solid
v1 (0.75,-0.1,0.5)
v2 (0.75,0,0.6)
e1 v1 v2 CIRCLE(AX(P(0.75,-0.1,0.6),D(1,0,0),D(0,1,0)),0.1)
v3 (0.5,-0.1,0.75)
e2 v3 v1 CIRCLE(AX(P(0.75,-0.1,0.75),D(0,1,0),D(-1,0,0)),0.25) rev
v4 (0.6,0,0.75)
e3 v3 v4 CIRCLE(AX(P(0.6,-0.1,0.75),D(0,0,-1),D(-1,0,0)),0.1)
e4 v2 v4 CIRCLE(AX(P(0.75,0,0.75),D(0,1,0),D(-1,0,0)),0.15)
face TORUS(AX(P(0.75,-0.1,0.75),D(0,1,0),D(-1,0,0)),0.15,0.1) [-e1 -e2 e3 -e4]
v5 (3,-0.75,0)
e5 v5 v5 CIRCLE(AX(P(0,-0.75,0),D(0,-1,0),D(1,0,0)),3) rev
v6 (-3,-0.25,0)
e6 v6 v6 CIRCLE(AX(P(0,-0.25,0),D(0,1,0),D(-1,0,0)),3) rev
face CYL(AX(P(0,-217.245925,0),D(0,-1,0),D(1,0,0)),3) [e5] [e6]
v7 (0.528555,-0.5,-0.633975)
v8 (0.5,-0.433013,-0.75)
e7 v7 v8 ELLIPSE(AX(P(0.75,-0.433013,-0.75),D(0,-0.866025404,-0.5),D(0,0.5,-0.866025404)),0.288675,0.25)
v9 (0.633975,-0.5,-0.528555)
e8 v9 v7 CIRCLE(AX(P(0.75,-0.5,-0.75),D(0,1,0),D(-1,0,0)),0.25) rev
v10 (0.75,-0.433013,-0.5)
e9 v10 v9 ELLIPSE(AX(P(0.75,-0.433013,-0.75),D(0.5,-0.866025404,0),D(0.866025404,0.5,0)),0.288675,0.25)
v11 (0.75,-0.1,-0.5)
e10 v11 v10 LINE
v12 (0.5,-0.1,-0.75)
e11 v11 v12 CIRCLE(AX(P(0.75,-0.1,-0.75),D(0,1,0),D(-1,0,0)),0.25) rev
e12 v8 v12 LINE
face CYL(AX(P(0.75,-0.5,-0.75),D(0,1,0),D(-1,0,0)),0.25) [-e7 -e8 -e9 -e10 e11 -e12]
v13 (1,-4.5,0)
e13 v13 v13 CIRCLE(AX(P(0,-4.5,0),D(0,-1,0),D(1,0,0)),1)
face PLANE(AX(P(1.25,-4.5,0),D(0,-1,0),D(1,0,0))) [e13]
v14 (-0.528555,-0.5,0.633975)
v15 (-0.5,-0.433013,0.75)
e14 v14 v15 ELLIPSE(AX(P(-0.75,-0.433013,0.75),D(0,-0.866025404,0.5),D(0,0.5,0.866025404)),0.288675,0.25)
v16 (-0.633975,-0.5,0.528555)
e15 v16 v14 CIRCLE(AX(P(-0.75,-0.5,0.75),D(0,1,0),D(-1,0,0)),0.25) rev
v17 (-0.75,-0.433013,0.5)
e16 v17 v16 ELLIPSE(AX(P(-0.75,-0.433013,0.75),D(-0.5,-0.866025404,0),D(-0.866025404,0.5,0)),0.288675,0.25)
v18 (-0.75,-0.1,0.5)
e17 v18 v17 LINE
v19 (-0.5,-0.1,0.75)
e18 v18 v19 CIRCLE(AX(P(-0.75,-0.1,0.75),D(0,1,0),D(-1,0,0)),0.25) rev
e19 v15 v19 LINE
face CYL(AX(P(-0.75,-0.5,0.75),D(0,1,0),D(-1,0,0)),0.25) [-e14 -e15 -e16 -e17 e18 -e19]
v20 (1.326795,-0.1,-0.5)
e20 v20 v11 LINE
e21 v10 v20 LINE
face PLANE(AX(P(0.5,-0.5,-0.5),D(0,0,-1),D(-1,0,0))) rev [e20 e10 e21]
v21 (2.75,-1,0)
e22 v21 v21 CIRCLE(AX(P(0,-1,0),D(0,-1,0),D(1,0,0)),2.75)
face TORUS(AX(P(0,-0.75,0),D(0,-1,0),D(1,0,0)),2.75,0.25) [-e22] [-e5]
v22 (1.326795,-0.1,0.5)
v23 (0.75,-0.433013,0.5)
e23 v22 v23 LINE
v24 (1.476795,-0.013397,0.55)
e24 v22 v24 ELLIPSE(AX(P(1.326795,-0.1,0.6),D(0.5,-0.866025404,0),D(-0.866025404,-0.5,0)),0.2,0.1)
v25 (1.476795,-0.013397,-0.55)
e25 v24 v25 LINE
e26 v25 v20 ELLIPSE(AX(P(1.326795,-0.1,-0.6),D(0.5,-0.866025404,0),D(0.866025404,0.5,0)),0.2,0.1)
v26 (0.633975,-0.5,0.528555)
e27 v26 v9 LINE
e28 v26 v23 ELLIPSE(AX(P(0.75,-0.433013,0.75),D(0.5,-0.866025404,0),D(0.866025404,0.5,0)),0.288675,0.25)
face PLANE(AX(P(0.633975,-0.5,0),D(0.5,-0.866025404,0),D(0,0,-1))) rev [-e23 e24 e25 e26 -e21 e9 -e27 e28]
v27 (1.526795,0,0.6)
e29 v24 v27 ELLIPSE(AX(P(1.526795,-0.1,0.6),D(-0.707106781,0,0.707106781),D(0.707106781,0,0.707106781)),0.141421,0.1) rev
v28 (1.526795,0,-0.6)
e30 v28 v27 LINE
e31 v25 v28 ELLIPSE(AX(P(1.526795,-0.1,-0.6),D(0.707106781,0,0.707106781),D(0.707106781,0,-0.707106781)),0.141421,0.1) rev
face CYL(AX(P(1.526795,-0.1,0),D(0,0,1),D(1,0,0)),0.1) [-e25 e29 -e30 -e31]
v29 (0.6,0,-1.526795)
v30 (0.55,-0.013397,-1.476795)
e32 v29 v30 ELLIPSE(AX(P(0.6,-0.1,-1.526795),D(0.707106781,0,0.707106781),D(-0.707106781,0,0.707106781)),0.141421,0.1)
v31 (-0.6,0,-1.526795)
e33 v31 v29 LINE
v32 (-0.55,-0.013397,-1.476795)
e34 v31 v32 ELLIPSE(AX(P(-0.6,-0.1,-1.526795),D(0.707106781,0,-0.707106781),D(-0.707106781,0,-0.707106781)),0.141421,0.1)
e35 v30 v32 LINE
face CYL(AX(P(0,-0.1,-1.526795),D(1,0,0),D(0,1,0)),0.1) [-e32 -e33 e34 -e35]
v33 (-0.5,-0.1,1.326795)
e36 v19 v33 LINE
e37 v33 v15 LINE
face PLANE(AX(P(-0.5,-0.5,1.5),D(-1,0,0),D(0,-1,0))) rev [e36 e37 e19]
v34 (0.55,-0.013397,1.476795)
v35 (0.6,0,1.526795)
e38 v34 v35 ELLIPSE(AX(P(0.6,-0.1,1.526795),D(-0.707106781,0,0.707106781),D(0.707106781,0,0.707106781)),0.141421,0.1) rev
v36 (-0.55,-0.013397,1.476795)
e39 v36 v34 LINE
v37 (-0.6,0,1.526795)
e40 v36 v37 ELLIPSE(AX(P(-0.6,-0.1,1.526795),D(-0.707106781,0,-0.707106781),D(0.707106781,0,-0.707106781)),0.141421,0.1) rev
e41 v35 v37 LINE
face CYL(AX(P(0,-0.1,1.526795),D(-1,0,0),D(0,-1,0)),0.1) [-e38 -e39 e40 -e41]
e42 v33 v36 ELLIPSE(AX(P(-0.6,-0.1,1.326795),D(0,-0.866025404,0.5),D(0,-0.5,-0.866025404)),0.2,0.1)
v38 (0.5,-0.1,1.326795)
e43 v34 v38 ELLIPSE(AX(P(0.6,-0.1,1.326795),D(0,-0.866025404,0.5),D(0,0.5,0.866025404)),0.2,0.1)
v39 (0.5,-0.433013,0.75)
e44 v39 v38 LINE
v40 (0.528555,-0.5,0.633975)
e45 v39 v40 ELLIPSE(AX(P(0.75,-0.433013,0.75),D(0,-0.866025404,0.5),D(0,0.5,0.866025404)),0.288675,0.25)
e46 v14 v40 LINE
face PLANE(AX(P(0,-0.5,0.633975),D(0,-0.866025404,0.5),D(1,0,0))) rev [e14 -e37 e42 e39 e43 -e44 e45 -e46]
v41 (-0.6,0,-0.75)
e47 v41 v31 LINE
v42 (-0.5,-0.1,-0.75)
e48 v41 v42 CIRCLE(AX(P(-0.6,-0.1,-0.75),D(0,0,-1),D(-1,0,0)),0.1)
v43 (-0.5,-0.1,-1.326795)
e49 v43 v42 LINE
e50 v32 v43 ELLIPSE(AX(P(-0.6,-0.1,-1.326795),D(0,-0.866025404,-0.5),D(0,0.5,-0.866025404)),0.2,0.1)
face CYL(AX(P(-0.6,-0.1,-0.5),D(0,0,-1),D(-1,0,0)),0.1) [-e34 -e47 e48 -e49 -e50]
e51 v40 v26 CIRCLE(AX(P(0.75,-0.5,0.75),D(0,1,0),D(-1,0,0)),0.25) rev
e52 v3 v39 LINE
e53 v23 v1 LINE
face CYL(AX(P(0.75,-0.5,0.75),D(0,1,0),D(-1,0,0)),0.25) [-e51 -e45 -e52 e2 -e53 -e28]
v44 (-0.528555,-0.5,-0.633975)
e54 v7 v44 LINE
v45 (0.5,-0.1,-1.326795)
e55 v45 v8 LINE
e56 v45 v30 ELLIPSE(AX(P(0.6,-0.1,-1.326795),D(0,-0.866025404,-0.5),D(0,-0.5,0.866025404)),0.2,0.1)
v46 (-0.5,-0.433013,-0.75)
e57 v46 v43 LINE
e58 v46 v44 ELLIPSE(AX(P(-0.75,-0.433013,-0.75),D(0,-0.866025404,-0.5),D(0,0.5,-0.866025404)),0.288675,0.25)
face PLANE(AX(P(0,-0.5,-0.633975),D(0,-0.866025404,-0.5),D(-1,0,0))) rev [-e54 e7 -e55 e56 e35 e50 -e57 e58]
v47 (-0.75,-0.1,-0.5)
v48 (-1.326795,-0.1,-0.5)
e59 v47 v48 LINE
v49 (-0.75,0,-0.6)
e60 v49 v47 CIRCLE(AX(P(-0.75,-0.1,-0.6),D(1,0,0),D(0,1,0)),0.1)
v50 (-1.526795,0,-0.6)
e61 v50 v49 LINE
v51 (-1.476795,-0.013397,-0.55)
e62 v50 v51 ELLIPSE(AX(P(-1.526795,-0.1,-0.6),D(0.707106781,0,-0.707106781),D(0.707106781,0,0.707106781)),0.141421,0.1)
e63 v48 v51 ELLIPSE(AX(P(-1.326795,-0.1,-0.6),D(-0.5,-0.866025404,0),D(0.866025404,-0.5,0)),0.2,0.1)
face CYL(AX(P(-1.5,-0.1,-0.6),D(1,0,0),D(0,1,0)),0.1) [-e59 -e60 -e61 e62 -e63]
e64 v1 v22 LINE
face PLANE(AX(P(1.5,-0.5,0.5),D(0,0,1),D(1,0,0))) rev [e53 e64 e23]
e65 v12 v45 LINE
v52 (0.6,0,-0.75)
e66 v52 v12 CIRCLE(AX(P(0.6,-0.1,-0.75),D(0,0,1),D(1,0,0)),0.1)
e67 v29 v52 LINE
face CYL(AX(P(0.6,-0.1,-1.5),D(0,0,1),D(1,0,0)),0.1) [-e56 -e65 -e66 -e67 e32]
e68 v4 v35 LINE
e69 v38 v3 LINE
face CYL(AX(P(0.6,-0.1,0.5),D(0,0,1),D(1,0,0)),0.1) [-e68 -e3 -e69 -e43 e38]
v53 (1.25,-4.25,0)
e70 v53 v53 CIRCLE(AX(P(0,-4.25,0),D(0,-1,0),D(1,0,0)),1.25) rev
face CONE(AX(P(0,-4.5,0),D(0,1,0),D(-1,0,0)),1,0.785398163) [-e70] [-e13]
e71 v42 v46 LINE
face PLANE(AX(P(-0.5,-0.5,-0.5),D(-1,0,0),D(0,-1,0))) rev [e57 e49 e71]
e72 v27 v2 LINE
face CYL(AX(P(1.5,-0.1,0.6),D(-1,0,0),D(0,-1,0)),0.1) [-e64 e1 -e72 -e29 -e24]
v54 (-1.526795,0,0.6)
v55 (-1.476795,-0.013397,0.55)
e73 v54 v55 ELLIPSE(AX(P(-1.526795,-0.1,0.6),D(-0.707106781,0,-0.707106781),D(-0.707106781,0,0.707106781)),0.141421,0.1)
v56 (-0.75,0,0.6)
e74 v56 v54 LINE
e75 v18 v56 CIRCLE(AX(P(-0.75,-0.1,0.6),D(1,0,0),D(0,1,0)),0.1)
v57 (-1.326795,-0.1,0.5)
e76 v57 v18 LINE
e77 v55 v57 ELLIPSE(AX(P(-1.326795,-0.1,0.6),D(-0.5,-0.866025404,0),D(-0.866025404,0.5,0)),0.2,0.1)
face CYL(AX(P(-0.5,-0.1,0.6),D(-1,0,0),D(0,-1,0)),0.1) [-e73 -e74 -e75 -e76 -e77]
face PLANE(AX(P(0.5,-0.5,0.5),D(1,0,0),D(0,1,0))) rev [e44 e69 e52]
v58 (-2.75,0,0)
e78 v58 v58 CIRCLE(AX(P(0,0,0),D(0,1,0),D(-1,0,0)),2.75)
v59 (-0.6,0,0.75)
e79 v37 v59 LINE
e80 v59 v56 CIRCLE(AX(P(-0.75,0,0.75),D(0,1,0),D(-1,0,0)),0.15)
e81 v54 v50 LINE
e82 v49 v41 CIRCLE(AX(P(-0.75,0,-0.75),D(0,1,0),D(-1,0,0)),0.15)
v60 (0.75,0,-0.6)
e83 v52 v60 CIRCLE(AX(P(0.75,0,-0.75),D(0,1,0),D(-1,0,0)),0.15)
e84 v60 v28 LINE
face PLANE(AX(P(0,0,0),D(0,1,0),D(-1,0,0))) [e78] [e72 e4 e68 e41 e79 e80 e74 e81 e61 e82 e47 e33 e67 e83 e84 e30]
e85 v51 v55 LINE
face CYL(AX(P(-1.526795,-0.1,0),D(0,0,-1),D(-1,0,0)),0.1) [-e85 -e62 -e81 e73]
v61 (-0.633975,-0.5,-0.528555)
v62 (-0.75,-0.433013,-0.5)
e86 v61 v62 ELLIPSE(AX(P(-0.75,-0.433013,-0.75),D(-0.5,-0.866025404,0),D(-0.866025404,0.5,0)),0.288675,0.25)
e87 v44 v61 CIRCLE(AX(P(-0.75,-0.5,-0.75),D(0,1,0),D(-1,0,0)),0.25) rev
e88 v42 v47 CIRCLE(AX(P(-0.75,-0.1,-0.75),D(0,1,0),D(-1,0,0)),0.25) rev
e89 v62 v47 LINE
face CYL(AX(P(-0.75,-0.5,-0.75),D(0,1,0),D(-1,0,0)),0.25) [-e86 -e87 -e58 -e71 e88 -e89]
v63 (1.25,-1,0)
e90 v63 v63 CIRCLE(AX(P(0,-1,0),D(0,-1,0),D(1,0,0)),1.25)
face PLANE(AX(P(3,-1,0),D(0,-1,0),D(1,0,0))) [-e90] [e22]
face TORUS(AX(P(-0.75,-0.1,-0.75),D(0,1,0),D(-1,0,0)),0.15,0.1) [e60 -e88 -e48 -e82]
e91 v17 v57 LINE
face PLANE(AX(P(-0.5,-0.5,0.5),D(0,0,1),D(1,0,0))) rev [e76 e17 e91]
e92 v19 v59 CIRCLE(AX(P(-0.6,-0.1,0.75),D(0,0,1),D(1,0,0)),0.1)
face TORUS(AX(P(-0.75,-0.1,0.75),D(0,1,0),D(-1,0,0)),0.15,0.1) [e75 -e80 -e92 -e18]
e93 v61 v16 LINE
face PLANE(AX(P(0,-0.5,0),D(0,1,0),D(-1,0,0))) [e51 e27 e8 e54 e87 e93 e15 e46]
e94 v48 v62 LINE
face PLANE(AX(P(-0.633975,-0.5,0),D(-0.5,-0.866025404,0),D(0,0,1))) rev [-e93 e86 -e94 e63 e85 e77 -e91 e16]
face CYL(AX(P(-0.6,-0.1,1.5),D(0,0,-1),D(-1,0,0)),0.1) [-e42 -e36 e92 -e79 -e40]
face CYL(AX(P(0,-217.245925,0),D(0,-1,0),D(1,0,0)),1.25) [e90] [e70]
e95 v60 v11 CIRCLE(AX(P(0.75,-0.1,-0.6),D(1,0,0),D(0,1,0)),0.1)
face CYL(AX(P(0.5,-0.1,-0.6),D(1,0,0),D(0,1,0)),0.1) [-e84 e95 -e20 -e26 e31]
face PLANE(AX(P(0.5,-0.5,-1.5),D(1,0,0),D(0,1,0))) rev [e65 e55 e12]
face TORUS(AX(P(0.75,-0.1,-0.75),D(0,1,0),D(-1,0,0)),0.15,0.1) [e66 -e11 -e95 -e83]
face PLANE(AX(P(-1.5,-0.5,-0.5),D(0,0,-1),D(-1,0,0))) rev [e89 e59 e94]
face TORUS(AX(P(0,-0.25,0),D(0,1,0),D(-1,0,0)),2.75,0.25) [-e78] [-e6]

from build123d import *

# Parameters (mm, degrees)
CUT_EXTRUDE1_DEPTH = 0.5
CHAMFER1_SIZE      = 0.5
CHAMFER1_SIZE_2    = 0.866025404
FILLET1_R          = 0.25
FILLET2_R          = 0.1
FILLET3_R          = 0.25
CHAMFER2_SIZE      = 0.25


with BuildPart() as part:
    # Sketch1 → Revolve1 (revolve)
    with BuildSketch(Plane.XY):
        Polygon((0, 0), (3, 0), (3, -1), (1.25, -1), (1.25, -4.5), (0, -4.5), align=None)
    revolve(axis=Axis((0, -217.245924753, 0), (0, 1, 0)))

    # Sketch2 → Cut-Extrude1 (cut)
    with BuildSketch(Plane(origin=(0, 0, 0), x_dir=(1, 0, 0), z_dir=(0, 1, 0))):
        Polygon((-0.5, 0.5), (-0.5, 1.5), (0.5, 1.5), (0.5, 0.5), (1.5, 0.5), (1.5, -0.5), (0.5, -0.5), (0.5, -1.5), (-0.5, -1.5), (-0.5, -0.5), (-1.5, -0.5), (-1.5, 0.5), align=None)
    extrude(amount=-CUT_EXTRUDE1_DEPTH, mode=Mode.SUBTRACT)

    # Chamfer1
    # the kernel refuses this chamfer: 0.866025404, 0.5 mm, written as the material it adds along each edge
    with BuildSketch(Plane(origin=(-1.5, -0.5, 0.5), x_dir=(-0.0578938624026749, 0.9983227437537924, 0), z_dir=(0, 0, -1)), Plane(origin=(0.5, -0.5, 1.5), x_dir=(-3.4244955923263397e-15, 0.9983227437537926, 0.057893862402671484), z_dir=(-1, 0, 0)), Plane(origin=(1.5, -0.5, -0.5), x_dir=(0.057893862402667626, 0.9983227437537928, 0), z_dir=(0, 0, 1)), Plane(origin=(-0.5, -0.5, -1.5), x_dir=(-3.4244955923263397e-15, 0.9983227437537926, -0.057893862402671484), z_dir=(1, 0, 0))) as chamfer1_piece_1:
        Polygon((CHAMFER1_SIZE * 0.998322743754, CHAMFER1_SIZE * 0.0578938624027), (-CHAMFER1_SIZE_2 * 0.0578938623883, CHAMFER1_SIZE_2 * 0.998322743505), (0, 0), align=None)
    extrude(amount=1)

    # Fillet1
    # the kernel refuses this fillet: 0.25 mm, written as the material it takes off along each edge
    with BuildSketch(Plane(origin=(-0.5, 0.625, 0.5), x_dir=(-1, 0, 0), z_dir=(0, -1, 0))) as fillet1_piece_1_section:
        with BuildLine():
            CenterArc((FILLET1_R, -FILLET1_R), FILLET1_R, 90, 90)
            Line((0, -FILLET1_R), (0, 0))
            Line((0, 0), (FILLET1_R, 0))
        make_face()
    fillet1_piece_1 = extrude(amount=1.125, mode=Mode.PRIVATE)
    fillet1_piece_1 = split(fillet1_piece_1, bisect_by=Plane(origin=(-0.82036424, -0.392387889, 0.556422311), z_dir=(0.4999999999999566, 0.8660254037844637, 0)), keep=Keep.TOP, mode=Mode.PRIVATE)
    fillet1_piece_1 = split(fillet1_piece_1, bisect_by=Plane(origin=(-0.556422311, -0.392387889, 0.82036424), z_dir=(0, 0.8660254037844637, -0.4999999999999566)), keep=Keep.TOP, mode=Mode.PRIVATE)
    add(fillet1_piece_1, mode=Mode.SUBTRACT)
    with BuildSketch(Plane(origin=(-0.5, 0.625, -0.5), x_dir=(-1, 0, 0), z_dir=(0, -1, 0))) as fillet1_piece_2_section:
        with BuildLine():
            CenterArc((FILLET1_R, FILLET1_R), FILLET1_R, 180, 90)
            Line((0, FILLET1_R), (0, 0))
            Line((0, 0), (FILLET1_R, 0))
        make_face()
    fillet1_piece_2 = extrude(amount=1.125, mode=Mode.PRIVATE)
    fillet1_piece_2 = split(fillet1_piece_2, bisect_by=Plane(origin=(-0.82036424, -0.392387889, -0.556422311), z_dir=(0.4999999999999566, 0.8660254037844637, 0)), keep=Keep.TOP, mode=Mode.PRIVATE)
    fillet1_piece_2 = split(fillet1_piece_2, bisect_by=Plane(origin=(-0.556422311, -0.392387889, -0.82036424), z_dir=(0, 0.8660254037844637, 0.4999999999999566)), keep=Keep.TOP, mode=Mode.PRIVATE)
    add(fillet1_piece_2, mode=Mode.SUBTRACT)
    with BuildSketch(Plane(origin=(0.5, 0.625, 0.5), x_dir=(1, 0, 0), z_dir=(0, -1, 0))) as fillet1_piece_3_section:
        with BuildLine():
            CenterArc((FILLET1_R, FILLET1_R), FILLET1_R, 180, 90)
            Line((0, FILLET1_R), (0, 0))
            Line((0, 0), (FILLET1_R, 0))
        make_face()
    fillet1_piece_3 = extrude(amount=1.125, mode=Mode.PRIVATE)
    fillet1_piece_3 = split(fillet1_piece_3, bisect_by=Plane(origin=(0.82036424, -0.392387889, 0.556422311), z_dir=(-0.4999999999999566, 0.8660254037844637, 0)), keep=Keep.TOP, mode=Mode.PRIVATE)
    fillet1_piece_3 = split(fillet1_piece_3, bisect_by=Plane(origin=(0.556422311, -0.392387889, 0.82036424), z_dir=(0, 0.8660254037844637, -0.4999999999999566)), keep=Keep.TOP, mode=Mode.PRIVATE)
    add(fillet1_piece_3, mode=Mode.SUBTRACT)
    with BuildSketch(Plane(origin=(0.5, 0.625, -0.5), x_dir=(0, 0, -1), z_dir=(0, -1, 0))) as fillet1_piece_4_section:
        with BuildLine():
            CenterArc((FILLET1_R, FILLET1_R), FILLET1_R, 180, 90)
            Line((0, FILLET1_R), (0, 0))
            Line((0, 0), (FILLET1_R, 0))
        make_face()
    fillet1_piece_4 = extrude(amount=1.125, mode=Mode.PRIVATE)
    fillet1_piece_4 = split(fillet1_piece_4, bisect_by=Plane(origin=(0.556422311, -0.392387889, -0.82036424), z_dir=(0, 0.8660254037844637, 0.4999999999999566)), keep=Keep.TOP, mode=Mode.PRIVATE)
    fillet1_piece_4 = split(fillet1_piece_4, bisect_by=Plane(origin=(0.82036424, -0.392387889, -0.556422311), z_dir=(-0.4999999999999566, 0.8660254037844637, 0)), keep=Keep.TOP, mode=Mode.PRIVATE)
    add(fillet1_piece_4, mode=Mode.SUBTRACT)

    # Fillet2
    fillet2_edges = [part.edges().sort_by_distance(p)[0] for p in [
        (-1.5, 0, 0),
        (-1.125, 0, 0.5),
        (0, 0, 1.5),
        (0.5, 0, 1.125),
        (1.5, 0, 0),
        (1.125, 0, -0.5),
        (0, 0, -1.5),
        (-0.5, 0, -1.125),
        (-0.5, 0, 1.125),
        (-1.125, 0, -0.5),
        (0.5, 0, -1.125),
        (1.125, 0, 0.5),
        (0.573223305, 0, -0.573223305),
        (0.573223305, 0, 0.573223305),
        (-0.573223305, 0, -0.573223305),
        (-0.573223305, 0, 0.573223305),
    ]]
    fillet(fillet2_edges, radius=FILLET2_R)

    # Fillet3
    fillet3_edges = [part.edges().sort_by_distance(p)[0] for p in [
        (-3, -1, 0),
        (-3, 0, 0),
    ]]
    fillet(fillet3_edges, radius=FILLET3_R)

    # Chamfer2
    chamfer2_edges = [part.edges().sort_by_distance(p)[0] for p in [
        (-1.25, -4.5, 0),
    ]]
    chamfer(chamfer2_edges, length=CHAMFER2_SIZE)


solid = part.part
